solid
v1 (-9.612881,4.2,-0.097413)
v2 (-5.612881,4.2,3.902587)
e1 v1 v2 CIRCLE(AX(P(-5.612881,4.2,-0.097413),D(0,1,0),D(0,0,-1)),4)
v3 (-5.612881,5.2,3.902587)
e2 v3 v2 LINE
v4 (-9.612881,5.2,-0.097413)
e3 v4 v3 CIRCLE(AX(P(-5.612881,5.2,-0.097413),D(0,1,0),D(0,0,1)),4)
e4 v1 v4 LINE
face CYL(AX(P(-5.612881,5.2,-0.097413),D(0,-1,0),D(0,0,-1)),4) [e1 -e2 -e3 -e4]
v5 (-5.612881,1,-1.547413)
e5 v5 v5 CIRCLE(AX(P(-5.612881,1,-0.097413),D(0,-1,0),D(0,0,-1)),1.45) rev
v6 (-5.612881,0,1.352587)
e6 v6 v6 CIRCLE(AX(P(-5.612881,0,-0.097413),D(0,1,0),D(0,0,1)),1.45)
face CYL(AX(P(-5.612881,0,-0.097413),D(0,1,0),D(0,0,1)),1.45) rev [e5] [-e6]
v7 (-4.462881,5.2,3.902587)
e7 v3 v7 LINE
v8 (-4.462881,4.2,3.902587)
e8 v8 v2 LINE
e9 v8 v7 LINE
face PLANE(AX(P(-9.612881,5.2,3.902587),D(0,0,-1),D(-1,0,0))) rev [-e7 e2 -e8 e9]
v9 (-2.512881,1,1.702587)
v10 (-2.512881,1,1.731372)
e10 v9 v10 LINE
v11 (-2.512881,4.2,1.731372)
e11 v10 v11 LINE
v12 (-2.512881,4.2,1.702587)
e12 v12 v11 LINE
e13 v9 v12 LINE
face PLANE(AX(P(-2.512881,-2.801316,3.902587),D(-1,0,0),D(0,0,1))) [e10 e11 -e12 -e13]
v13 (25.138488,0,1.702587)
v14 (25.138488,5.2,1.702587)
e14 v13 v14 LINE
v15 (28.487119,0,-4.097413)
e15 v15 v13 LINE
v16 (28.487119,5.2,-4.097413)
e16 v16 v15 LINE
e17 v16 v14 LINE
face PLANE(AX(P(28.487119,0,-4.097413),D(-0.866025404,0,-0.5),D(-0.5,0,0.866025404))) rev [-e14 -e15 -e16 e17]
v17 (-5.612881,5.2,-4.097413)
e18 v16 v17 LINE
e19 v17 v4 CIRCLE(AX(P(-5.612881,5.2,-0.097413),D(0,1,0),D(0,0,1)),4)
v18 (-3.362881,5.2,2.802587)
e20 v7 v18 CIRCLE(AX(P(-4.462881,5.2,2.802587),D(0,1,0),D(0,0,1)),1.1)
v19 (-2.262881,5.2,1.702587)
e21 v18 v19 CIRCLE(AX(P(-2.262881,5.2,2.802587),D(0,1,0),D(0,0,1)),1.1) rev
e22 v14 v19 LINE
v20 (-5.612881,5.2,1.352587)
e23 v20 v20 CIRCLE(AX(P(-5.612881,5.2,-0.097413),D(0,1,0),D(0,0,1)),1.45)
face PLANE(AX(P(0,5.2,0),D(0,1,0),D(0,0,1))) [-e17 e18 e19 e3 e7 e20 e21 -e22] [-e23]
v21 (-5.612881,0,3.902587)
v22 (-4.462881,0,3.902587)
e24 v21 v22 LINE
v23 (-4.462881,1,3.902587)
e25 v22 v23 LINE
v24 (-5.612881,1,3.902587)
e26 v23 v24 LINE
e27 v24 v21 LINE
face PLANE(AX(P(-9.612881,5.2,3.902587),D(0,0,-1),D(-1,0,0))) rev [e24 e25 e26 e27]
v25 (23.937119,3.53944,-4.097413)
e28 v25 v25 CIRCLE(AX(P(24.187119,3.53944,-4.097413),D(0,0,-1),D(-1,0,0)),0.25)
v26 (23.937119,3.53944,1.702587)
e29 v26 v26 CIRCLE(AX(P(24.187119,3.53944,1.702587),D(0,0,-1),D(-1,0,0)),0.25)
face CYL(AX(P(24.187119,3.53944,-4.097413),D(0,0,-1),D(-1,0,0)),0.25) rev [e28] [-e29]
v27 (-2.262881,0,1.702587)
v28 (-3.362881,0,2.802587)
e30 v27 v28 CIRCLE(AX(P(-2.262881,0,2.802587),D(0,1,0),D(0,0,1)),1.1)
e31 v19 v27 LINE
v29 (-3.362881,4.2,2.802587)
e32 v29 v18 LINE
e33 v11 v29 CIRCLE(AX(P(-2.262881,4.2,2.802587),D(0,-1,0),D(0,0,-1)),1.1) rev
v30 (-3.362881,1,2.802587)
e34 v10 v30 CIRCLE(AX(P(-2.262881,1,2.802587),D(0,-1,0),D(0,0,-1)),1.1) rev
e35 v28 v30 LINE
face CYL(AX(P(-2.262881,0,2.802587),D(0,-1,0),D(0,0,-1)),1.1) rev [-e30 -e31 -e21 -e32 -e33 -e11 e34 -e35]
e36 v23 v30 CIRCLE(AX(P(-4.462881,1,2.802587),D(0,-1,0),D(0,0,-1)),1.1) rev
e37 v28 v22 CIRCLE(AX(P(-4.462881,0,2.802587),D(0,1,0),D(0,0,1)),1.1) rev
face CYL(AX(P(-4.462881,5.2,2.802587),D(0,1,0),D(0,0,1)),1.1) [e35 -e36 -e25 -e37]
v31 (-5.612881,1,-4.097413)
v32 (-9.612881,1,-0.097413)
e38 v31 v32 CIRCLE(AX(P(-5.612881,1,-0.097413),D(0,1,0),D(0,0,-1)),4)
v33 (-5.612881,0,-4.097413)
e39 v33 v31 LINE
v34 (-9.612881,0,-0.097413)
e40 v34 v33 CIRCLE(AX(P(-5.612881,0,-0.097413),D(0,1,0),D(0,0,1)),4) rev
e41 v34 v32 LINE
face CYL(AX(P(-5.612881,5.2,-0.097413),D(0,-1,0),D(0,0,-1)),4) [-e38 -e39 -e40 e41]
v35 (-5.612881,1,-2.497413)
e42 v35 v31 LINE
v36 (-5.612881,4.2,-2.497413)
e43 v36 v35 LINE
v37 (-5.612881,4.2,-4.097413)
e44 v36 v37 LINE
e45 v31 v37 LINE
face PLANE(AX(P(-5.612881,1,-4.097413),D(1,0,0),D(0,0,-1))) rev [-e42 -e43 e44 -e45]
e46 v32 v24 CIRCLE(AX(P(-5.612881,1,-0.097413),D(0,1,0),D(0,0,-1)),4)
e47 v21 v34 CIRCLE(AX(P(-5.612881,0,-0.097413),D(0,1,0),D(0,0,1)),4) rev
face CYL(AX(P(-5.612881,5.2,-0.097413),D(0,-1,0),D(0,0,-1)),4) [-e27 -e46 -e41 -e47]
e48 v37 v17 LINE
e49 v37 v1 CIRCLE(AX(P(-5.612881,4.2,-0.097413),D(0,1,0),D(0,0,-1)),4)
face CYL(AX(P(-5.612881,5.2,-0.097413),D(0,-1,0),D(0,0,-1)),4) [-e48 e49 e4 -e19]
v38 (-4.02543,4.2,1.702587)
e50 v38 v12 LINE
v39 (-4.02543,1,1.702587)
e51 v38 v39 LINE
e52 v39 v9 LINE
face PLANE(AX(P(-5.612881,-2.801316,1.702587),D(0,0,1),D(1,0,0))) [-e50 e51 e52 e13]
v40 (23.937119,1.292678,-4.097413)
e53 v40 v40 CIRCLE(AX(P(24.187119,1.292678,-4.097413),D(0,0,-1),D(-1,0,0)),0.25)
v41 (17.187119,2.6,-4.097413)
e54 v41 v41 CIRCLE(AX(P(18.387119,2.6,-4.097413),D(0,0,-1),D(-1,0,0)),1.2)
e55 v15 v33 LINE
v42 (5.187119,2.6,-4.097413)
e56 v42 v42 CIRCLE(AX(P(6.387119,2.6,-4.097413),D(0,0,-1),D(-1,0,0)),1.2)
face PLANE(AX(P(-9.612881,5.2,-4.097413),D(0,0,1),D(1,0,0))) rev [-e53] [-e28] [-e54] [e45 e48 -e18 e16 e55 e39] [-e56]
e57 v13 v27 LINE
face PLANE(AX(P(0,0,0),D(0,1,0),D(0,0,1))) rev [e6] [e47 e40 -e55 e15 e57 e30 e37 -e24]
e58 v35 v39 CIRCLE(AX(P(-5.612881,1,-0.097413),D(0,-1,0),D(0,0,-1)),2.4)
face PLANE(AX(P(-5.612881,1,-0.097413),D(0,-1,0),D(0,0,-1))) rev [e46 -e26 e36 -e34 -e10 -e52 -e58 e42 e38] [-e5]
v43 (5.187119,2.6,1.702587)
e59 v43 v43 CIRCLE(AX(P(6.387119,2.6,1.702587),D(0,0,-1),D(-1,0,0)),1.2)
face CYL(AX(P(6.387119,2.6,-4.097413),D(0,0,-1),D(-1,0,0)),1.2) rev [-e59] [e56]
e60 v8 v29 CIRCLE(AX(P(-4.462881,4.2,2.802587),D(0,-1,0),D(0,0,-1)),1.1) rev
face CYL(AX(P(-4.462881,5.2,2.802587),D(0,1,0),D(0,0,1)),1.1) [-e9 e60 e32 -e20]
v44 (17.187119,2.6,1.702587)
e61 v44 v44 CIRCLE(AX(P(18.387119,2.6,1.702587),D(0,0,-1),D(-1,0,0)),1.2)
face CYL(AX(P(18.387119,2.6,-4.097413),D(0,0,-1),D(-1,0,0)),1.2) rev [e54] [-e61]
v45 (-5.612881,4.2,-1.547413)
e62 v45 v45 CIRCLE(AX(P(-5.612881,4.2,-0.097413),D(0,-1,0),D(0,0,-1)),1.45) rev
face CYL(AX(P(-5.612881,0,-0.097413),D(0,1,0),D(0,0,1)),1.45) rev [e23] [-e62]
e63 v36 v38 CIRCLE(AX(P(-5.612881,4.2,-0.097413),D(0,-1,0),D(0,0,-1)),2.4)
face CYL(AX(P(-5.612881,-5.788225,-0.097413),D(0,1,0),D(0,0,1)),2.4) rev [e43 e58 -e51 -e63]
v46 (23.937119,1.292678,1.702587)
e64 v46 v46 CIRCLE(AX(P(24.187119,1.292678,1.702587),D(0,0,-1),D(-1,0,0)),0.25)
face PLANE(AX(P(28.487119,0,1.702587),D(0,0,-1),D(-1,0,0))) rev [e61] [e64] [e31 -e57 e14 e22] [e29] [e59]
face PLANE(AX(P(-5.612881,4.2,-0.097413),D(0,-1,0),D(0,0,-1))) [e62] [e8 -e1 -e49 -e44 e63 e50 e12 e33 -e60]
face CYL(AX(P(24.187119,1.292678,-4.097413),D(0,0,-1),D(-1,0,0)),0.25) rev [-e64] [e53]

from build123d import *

# Parameters (mm, degrees)
SKETCH1_W                  = 38.1
SKETCH1_H                  = 8
BOSS_EXTRUDE1_DEPTH        = 5.2
FILLET1_R                  = 4
SKETCH3_R                  = 1.45
CUT_EXTRUDE1_DEPTH         = 5.2
SKETCH4_W                  = 31.85
SKETCH4_H                  = 2.2
CUT_EXTRUDE2_DEPTH         = 5.2
FILLET2_R                  = 1.1
FILLET3_R                  = 1.1
CUT_EXTRUDE3_DEPTH         = 5.2
CUT_EXTRUDE4_START         = -9.612880748
CUT_EXTRUDE4_OUTLINE_W     = 3.2
CUT_EXTRUDE4_OUTLINE_H     = 11
CUT_EXTRUDE4_DEPTH         = 4
SKETCH8_W                  = 3.1
SKETCH8_H                  = 2.2
CUT_EXTRUDE5_DEPTH         = 3.2
SKETCH9_R                  = 2.4
CUT_EXTRUDE6_DEPTH         = 3.2
M2_CLEARANCE_HOLE1_D       = 2.4
F_0_5_0_5_DIAMETER_HOLE1_D = 0.5


# Read off the part's stored shape, not the designer's step: Cut-Extrude4
with BuildPart() as part:
    # Sketch1 → Boss-Extrude1 (new body)
    with BuildSketch(Plane(origin=(0, 0, 0), x_dir=(1, 0, 0), z_dir=(0, 1, 0))):
        with Locations((9.437119252, 0.097413434)):
            Rectangle(SKETCH1_W, SKETCH1_H)
    extrude(amount=BOSS_EXTRUDE1_DEPTH)

    # Fillet1
    fillet1_edges = [part.edges().sort_by_distance(p)[0] for p in [
        (-9.612880748, 2.6, -4.097413434),
        (-9.612880748, 2.6, 3.902586566),
    ]]
    fillet(fillet1_edges, radius=FILLET1_R - 0.0001)  # a hair under: the kernel refuses the full size

    # Sketch3 → Cut-Extrude1 (cut)
    with BuildSketch(Plane(origin=(0, 5.2, 0), x_dir=(1, 0, 0), z_dir=(0, 1, 0))):
        with Locations(Location((-5.612880748, 0.097413434, 0), (0, 0, 270))):
            Circle(SKETCH3_R)
    extrude(amount=-CUT_EXTRUDE1_DEPTH, mode=Mode.SUBTRACT)

    # Sketch4 → Cut-Extrude2 (cut)
    with BuildSketch(Plane(origin=(0, 5.2, 0), x_dir=(1, 0, 0), z_dir=(0, 1, 0))):
        with Locations((12.562119252, -2.802586566)):
            Rectangle(SKETCH4_W, SKETCH4_H)
    extrude(amount=-CUT_EXTRUDE2_DEPTH, mode=Mode.SUBTRACT)

    # Fillet2
    fillet2_edges = [part.edges().sort_by_distance(p)[0] for p in [
        (-3.362880748, 2.6, 1.702586566),
    ]]
    fillet(fillet2_edges, radius=FILLET2_R)

    # Fillet3
    fillet3_edges = [part.edges().sort_by_distance(p)[0] for p in [
        (-3.362880748, 2.6, 3.902586566),
    ]]
    fillet(fillet3_edges, radius=FILLET3_R - 0.0001)  # a hair under: the kernel refuses the full size

    # Sketch5 → Cut-Extrude3 (cut)
    with BuildSketch(Plane(origin=(0, 5.2, 0), x_dir=(1, 0, 0), z_dir=(0, 1, 0))):
        Polygon((28.487119252, 4.097413434), (25.138487691, -1.702586566), (28.487119252, -1.702586566), align=None)
    extrude(amount=-CUT_EXTRUDE3_DEPTH, mode=Mode.SUBTRACT)

    # Cut-Extrude4 outline → Cut-Extrude4 (cut)
    with BuildSketch(Plane.YZ.offset(CUT_EXTRUDE4_START)):
        with Locations((2.6, -0.5)):
            Rectangle(CUT_EXTRUDE4_OUTLINE_W, CUT_EXTRUDE4_OUTLINE_H)
    extrude(amount=CUT_EXTRUDE4_DEPTH, mode=Mode.SUBTRACT)

    # Sketch8 → Cut-Extrude5 (cut)
    with BuildSketch(Plane.XZ.offset(-4.2)):
        with Locations((-4.062880748, 2.802586566)):
            Rectangle(SKETCH8_W, SKETCH8_H)
    extrude(amount=CUT_EXTRUDE5_DEPTH, mode=Mode.SUBTRACT)

    # Sketch9 → Cut-Extrude6 (cut)
    with BuildSketch(Plane.XZ.offset(-4.2)):
        with Locations((-5.612880748, -0.097413434)):
            Circle(SKETCH9_R)
    extrude(amount=CUT_EXTRUDE6_DEPTH, mode=Mode.SUBTRACT)

    # M2 Clearance Hole1 (through all)
    with Locations(Plane(origin=(6.387119252, 2.6, -4.097413434), x_dir=(-1, 0, 0), z_dir=(0, 0, -1))):
        with Locations((0, 0), (-12, 0)):
            Hole(M2_CLEARANCE_HOLE1_D / 2)

    # Ø0.5 (0.5) Diameter Hole1 (through all)
    with Locations(Plane(origin=(24.187119252, 3.539440359, -4.097413434), x_dir=(-1, 0, 0), z_dir=(0, 0, -1))):
        with Locations((0, 0), (0, -2.246762327)):
            Hole(F_0_5_0_5_DIAMETER_HOLE1_D / 2)


solid = part.part
